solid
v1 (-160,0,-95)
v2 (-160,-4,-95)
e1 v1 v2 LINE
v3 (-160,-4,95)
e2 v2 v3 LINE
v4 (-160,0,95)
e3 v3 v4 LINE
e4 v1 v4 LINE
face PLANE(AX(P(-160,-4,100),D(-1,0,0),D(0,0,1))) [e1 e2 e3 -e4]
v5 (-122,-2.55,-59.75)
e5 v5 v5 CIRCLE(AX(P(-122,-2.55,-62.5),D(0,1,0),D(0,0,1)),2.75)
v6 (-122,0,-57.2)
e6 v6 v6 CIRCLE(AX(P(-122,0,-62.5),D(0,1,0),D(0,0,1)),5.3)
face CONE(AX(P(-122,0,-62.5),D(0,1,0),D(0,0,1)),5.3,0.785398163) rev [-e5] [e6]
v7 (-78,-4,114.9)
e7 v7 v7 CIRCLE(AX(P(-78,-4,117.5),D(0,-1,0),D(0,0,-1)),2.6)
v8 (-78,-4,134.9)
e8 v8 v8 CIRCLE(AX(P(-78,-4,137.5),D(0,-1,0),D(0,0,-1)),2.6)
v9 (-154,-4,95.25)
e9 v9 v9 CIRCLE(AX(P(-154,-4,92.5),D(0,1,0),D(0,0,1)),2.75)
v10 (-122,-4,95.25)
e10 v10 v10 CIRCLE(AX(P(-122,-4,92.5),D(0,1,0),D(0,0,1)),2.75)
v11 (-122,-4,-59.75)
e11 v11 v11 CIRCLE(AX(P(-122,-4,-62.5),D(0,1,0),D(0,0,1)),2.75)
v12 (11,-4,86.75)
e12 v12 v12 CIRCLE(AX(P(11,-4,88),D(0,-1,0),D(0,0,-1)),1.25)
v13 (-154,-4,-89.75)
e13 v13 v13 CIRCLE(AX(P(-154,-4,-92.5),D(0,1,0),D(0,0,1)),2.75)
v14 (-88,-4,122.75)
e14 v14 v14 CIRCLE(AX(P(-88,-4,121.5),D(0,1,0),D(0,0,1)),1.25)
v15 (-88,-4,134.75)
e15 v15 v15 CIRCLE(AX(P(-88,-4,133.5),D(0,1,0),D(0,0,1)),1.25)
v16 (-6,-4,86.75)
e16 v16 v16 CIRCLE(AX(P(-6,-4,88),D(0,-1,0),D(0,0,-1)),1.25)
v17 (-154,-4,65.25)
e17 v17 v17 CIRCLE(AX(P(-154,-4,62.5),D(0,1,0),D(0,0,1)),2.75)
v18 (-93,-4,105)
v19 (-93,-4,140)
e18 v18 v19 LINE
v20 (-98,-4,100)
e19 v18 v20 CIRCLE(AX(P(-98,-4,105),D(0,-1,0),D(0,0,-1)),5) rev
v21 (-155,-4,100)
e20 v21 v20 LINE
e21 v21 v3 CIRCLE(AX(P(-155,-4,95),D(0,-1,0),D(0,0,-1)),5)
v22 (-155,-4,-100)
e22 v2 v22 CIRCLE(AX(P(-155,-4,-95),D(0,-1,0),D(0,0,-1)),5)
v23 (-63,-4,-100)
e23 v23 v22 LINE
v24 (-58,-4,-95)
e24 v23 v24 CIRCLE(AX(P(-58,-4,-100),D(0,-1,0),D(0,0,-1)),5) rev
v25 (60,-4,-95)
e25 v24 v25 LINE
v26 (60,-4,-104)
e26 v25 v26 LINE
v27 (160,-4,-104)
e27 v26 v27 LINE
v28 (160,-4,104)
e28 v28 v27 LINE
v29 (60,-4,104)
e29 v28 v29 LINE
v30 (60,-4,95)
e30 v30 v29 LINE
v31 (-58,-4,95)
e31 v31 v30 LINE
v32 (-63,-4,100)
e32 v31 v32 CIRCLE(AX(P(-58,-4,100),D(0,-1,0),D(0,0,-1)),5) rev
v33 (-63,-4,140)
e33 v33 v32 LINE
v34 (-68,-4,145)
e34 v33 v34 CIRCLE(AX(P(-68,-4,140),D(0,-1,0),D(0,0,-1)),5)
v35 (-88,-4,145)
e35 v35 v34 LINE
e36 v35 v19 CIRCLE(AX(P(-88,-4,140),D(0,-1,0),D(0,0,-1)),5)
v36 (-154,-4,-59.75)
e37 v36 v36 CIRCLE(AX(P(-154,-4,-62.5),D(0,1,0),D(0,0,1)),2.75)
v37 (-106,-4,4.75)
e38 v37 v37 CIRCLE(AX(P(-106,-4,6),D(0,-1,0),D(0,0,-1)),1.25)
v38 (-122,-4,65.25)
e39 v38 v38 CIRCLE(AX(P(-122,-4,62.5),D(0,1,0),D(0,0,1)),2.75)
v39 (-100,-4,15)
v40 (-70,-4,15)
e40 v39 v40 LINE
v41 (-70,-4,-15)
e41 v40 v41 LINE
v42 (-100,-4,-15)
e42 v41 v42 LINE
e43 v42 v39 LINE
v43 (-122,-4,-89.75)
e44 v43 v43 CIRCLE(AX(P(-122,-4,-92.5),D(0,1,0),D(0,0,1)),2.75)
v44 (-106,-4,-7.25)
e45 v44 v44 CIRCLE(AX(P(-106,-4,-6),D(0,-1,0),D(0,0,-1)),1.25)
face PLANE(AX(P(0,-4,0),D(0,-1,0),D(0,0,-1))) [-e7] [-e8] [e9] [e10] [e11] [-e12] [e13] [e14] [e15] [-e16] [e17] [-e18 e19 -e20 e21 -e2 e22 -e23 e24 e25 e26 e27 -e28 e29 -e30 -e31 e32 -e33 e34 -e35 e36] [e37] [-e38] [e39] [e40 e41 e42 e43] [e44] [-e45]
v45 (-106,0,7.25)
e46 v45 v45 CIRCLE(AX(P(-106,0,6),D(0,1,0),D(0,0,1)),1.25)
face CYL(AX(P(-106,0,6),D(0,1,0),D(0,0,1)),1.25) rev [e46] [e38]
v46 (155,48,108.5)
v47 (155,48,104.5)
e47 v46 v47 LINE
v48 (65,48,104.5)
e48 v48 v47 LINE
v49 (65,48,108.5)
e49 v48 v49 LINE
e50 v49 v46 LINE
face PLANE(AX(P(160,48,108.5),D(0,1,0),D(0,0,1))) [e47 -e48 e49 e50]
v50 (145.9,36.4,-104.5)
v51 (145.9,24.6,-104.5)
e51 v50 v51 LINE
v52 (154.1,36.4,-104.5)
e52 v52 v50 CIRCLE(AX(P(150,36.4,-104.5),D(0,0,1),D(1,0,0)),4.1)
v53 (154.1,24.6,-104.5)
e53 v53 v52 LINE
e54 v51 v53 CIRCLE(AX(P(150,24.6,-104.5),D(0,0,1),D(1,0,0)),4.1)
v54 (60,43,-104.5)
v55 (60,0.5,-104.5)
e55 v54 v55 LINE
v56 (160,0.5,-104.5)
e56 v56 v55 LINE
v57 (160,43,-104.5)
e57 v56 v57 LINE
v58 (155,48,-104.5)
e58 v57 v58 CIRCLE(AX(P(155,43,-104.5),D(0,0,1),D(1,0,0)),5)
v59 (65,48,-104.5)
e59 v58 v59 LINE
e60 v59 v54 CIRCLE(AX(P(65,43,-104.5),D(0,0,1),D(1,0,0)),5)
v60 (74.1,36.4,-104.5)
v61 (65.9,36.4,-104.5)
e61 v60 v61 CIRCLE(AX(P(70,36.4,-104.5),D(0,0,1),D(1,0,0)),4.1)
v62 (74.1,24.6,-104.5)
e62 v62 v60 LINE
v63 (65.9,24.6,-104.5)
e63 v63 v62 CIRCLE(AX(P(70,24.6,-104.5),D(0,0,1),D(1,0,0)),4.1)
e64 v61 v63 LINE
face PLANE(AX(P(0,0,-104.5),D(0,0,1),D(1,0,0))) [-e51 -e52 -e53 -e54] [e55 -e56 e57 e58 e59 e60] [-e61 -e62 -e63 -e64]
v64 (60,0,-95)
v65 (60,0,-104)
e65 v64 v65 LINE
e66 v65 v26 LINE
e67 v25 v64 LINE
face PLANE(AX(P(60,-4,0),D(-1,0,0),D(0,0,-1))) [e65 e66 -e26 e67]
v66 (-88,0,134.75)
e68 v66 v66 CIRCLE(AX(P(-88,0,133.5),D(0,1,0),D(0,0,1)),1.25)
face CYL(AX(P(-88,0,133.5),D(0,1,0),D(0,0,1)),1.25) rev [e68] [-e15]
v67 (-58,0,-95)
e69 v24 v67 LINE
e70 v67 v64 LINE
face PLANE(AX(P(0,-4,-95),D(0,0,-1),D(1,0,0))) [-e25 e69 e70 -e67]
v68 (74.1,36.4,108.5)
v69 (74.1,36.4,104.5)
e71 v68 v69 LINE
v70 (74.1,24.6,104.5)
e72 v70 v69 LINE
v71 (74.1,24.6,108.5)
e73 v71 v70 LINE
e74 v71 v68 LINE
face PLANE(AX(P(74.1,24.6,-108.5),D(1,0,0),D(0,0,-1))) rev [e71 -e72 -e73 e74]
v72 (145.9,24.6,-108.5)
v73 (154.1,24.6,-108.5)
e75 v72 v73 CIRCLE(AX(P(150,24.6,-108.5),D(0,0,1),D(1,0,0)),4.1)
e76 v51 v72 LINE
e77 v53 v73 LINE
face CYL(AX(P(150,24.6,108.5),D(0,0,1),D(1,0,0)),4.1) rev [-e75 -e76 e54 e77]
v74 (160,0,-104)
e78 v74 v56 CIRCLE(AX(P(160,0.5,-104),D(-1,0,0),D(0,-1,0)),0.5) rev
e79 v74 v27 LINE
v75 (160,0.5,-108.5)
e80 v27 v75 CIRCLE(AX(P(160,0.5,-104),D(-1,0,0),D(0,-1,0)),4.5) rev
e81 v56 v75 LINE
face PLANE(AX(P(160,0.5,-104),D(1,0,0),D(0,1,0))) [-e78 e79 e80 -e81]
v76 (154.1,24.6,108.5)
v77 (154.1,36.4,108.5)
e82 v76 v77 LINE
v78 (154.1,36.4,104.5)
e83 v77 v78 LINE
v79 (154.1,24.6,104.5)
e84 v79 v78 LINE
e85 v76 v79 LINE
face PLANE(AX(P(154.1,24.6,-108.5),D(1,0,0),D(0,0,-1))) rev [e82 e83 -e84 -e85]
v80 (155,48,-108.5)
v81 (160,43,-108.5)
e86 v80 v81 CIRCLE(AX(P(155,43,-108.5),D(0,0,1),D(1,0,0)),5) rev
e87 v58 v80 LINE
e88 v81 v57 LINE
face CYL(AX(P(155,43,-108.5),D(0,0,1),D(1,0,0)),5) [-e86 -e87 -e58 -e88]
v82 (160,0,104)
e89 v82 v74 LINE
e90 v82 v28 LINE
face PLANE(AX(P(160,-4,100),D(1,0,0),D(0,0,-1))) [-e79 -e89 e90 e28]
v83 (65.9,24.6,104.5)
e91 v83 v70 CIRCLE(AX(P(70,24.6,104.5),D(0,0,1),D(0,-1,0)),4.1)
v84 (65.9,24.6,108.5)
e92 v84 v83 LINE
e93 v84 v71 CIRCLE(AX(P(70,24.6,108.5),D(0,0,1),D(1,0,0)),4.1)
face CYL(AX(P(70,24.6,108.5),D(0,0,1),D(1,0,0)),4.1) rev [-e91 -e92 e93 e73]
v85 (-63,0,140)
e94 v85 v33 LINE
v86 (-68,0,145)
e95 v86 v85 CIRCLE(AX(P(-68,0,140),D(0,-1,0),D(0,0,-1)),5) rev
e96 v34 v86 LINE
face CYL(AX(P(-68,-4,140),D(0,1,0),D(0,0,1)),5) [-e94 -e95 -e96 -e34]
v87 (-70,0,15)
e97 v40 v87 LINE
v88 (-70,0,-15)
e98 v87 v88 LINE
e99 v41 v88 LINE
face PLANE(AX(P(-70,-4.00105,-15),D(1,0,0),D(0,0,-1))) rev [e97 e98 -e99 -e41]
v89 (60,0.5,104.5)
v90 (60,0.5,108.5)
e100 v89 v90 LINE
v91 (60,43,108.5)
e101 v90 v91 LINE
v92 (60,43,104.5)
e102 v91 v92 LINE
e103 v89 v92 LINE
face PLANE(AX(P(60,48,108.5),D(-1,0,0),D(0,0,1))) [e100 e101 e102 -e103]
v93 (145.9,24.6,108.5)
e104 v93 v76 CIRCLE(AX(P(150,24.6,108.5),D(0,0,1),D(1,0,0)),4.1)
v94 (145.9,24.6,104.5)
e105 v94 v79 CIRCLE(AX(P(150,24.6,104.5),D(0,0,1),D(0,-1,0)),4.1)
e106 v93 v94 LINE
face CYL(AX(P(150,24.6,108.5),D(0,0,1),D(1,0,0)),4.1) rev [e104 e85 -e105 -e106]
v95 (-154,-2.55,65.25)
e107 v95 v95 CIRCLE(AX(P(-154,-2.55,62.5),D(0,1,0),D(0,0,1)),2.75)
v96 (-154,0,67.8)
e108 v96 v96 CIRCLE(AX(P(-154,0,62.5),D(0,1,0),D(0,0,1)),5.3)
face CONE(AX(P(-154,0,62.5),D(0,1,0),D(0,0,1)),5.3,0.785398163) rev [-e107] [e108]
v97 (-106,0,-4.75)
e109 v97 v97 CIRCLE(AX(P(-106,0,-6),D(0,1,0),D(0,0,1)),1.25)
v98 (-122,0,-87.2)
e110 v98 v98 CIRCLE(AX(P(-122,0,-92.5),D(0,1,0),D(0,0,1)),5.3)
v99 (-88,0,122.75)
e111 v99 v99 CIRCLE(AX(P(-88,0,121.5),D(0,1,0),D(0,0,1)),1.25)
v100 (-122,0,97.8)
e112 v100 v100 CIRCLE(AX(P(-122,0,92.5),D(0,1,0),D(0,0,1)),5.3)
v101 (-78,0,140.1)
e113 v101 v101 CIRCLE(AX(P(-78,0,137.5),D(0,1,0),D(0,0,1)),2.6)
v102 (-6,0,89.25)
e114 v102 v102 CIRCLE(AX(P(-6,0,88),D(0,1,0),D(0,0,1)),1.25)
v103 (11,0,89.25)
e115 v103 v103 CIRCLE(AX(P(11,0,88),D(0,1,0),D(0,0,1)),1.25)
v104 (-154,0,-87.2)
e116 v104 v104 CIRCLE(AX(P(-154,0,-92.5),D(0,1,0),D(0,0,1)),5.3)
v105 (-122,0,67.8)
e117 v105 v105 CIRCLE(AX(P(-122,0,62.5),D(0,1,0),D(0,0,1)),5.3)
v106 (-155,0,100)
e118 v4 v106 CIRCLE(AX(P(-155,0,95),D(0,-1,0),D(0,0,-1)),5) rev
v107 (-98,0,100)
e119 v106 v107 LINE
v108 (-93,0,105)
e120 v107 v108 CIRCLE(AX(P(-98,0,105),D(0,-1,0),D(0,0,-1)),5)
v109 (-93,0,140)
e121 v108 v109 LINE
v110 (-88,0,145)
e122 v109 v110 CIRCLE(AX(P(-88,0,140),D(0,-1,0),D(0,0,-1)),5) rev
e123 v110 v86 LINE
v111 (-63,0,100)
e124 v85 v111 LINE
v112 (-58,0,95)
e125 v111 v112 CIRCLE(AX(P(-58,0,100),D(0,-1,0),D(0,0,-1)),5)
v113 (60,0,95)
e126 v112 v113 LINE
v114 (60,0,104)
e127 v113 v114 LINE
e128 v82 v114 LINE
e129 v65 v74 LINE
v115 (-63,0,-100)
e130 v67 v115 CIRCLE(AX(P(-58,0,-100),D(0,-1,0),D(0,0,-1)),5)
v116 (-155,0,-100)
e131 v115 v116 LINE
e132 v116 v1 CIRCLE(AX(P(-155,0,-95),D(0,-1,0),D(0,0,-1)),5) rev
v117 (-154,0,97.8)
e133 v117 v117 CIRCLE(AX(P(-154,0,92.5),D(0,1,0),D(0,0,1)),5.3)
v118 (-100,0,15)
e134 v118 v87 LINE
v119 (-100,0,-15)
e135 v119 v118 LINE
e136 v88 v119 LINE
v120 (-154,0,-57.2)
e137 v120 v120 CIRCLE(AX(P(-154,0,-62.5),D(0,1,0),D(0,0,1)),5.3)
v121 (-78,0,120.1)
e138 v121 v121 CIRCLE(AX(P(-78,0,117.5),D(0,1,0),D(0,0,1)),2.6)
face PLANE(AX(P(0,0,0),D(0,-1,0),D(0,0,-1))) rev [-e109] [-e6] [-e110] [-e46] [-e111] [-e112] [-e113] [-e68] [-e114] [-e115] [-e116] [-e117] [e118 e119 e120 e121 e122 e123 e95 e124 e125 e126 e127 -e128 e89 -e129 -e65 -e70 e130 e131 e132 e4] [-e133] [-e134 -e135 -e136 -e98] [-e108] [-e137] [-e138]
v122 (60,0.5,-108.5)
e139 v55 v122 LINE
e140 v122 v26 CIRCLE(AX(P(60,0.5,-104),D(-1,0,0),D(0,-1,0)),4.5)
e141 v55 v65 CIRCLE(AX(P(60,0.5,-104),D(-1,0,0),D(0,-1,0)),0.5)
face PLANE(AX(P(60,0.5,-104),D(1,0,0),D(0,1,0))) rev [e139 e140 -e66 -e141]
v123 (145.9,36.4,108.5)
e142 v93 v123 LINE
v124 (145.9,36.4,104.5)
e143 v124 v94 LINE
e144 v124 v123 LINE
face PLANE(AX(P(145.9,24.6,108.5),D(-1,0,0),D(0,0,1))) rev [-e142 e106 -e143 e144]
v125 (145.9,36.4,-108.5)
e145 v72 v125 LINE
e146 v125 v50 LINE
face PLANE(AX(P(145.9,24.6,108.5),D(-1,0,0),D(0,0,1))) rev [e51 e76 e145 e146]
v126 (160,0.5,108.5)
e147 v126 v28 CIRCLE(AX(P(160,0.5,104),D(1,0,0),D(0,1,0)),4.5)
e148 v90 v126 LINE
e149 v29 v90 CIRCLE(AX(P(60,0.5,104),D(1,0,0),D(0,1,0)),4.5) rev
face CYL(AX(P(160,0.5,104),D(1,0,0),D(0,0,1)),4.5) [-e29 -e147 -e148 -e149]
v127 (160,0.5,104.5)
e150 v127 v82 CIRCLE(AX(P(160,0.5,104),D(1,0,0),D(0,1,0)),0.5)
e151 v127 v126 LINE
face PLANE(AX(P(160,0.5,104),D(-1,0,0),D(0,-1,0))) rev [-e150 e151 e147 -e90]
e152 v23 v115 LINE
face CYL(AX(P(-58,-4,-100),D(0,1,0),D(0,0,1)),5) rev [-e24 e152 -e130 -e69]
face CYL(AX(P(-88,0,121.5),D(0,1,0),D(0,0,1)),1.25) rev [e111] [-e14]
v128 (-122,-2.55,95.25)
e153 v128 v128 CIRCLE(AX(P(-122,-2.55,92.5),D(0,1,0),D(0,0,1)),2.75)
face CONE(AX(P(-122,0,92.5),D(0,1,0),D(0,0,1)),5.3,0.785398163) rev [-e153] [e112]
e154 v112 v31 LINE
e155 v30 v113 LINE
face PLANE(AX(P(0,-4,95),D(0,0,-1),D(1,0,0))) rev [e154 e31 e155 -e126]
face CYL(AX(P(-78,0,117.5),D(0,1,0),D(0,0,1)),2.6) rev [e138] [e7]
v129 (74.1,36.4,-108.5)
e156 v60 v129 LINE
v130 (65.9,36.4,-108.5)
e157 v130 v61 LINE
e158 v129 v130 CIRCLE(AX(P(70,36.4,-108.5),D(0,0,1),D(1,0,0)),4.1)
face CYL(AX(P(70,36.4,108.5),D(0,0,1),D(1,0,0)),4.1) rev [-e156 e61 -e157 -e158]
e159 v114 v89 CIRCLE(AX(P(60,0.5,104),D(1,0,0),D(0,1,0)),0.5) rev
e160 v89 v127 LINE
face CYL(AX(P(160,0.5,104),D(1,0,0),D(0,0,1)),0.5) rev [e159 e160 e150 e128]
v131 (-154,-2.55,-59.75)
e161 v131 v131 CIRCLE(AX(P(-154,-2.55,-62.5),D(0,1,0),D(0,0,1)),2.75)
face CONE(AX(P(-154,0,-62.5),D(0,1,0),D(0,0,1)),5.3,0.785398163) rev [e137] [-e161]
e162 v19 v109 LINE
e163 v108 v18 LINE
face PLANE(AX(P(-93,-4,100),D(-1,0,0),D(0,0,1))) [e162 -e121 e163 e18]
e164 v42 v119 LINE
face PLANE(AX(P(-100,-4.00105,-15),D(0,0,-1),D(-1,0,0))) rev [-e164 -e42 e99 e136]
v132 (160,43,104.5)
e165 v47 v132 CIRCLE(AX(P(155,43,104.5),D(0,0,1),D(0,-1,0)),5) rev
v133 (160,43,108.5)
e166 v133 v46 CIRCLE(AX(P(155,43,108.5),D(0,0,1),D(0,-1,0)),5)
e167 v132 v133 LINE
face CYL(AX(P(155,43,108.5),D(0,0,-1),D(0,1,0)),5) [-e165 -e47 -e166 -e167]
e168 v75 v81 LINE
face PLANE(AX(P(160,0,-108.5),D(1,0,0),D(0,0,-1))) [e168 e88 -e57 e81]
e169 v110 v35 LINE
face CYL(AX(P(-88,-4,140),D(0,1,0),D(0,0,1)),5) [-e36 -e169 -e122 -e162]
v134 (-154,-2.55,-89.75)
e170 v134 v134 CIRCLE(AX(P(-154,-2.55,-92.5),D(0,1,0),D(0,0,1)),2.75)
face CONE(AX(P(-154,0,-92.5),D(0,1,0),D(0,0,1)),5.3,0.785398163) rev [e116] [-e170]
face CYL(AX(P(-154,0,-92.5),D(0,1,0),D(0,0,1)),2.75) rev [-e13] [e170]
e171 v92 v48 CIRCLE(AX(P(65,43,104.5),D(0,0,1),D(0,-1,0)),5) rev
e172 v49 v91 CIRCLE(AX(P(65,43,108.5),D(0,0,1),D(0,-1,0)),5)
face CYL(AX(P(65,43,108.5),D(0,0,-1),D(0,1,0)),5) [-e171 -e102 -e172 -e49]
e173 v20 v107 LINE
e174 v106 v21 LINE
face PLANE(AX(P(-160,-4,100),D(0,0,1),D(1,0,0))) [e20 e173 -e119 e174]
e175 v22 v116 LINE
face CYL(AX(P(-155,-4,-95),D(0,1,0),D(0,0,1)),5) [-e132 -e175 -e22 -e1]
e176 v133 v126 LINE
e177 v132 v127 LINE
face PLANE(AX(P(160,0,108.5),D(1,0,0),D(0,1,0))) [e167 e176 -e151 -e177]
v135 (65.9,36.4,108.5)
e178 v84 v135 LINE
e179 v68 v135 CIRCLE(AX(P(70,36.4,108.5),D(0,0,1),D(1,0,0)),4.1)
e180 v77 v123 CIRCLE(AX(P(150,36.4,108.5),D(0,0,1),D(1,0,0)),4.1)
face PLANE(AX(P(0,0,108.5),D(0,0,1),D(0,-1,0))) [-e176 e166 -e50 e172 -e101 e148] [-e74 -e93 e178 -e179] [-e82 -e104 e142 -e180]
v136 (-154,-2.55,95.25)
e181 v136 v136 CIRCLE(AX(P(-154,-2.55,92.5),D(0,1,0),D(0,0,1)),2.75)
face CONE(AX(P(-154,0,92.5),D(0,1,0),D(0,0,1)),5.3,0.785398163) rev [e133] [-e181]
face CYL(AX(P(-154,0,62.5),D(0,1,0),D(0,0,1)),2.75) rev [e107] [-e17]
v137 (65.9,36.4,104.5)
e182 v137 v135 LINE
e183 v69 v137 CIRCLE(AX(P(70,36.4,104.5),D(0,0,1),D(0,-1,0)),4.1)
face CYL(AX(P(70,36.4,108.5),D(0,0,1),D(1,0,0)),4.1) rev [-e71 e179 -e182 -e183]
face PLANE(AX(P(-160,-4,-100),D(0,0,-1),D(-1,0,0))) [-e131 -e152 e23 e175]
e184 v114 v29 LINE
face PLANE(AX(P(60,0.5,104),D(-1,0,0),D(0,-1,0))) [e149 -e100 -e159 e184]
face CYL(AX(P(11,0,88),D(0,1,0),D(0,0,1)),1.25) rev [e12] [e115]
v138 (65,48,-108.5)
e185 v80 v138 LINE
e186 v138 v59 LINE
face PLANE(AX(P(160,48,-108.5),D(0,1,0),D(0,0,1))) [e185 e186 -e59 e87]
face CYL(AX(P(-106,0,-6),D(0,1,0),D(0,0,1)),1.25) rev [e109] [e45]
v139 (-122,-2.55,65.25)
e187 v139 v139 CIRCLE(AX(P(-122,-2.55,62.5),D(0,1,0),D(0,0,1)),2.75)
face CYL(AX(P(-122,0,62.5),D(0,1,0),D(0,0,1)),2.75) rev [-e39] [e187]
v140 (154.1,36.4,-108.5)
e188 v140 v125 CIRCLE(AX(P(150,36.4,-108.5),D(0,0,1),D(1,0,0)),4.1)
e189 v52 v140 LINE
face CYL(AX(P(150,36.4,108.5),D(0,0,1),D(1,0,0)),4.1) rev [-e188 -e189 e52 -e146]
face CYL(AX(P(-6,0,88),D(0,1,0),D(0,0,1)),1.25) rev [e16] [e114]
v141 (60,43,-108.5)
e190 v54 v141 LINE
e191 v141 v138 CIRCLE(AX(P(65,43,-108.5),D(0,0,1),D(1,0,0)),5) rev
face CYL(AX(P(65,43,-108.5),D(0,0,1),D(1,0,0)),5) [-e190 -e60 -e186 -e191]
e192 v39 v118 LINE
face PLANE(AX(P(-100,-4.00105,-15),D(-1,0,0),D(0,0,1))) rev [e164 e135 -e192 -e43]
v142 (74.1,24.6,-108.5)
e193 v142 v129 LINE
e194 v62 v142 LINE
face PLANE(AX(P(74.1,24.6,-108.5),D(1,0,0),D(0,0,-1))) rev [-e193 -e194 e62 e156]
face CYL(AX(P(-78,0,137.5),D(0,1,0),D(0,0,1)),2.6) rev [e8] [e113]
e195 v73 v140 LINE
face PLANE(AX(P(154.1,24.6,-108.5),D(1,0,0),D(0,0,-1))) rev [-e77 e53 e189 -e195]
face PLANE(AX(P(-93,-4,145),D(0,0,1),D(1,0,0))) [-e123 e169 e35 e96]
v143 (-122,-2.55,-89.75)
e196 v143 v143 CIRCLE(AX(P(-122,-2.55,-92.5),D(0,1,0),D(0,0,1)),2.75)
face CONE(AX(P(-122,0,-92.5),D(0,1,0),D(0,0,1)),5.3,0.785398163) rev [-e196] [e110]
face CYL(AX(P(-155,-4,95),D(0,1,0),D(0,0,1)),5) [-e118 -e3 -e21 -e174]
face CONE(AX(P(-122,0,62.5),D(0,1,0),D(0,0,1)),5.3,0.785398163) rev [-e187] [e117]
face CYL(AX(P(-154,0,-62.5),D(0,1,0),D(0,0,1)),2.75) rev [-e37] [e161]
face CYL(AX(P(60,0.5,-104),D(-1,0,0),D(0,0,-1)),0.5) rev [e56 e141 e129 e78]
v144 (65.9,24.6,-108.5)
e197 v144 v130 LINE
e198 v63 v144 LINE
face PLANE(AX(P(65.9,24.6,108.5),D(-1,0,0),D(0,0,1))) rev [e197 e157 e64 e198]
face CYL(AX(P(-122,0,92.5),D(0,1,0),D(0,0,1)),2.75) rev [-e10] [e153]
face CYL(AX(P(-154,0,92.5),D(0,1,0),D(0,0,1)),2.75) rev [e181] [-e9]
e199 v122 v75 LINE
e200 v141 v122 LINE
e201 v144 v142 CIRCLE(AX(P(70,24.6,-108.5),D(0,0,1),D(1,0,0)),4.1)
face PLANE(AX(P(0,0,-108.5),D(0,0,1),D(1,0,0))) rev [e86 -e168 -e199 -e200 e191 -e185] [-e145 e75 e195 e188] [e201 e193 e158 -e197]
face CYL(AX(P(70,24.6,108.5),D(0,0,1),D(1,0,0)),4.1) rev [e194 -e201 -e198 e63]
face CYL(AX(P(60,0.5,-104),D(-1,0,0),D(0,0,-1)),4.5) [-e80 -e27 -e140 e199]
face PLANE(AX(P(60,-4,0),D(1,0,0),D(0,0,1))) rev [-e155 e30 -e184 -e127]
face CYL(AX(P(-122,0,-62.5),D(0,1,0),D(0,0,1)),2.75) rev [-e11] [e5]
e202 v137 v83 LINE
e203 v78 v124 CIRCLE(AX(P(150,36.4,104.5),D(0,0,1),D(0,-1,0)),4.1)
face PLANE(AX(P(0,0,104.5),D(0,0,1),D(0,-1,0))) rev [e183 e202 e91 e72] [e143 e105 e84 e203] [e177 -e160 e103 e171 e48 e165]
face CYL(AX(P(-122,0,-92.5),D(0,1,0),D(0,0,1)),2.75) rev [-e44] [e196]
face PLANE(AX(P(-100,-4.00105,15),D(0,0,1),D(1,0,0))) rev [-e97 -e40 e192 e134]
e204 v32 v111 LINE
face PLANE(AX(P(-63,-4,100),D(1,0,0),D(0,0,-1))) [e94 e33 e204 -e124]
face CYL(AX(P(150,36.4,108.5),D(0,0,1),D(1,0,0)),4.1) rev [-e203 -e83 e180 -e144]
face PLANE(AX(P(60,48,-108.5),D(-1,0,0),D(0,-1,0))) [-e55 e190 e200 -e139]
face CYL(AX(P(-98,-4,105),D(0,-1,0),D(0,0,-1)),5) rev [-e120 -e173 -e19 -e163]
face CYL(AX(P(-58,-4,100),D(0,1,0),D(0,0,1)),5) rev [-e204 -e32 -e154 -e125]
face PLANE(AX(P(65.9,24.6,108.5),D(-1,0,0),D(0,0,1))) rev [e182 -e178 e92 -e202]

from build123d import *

# Parameters (mm, degrees)
SKETCH_1_W                  = 320
SKETCH_1_H                  = 200
SM_BASE_FLANGE_1_DEPTH      = 4
HOLE_WIZARD_1_AT_2_COUNT    = 2
HOLE_WIZARD_1_AT_2_PITCH    = 30
HOLE_WIZARD_1_AT_3_COUNT    = 2
HOLE_WIZARD_1_AT_3_PITCH    = 43.863424399
HOLE_WIZARD_1_AT_4_COUNT    = 2
HOLE_WIZARD_1_AT_4_PITCH    = 32
HOLE_WIZARD_1_AT_5_COUNT    = 2
HOLE_WIZARD_1_AT_5_PITCH    = 129.031004026
HOLE_WIZARD_1_AT_6_COUNT    = 2
HOLE_WIZARD_1_AT_6_PITCH    = 125
HOLE_WIZARD_1_AT_7_COUNT    = 2
HOLE_WIZARD_1_AT_7_PITCH    = 158.268758762
HOLE_WIZARD_1_AT_8_COUNT    = 2
HOLE_WIZARD_1_AT_8_PITCH    = 155
SKETCH_9_W                  = 30
SKETCH_9_H                  = 45
SM_BASE_FLANGE_1_2_DEPTH    = 4
SKETCH_27_W                 = 123
SKETCH_27_H                 = 5
CUT_EXTRUDE_2_DEPTH         = 10
SM_EDGE_FLANGE_1_DEPTH      = 100
SM_EDGE_FLANGE_1_BEND_DEPTH = 100
HOLE_START                  = -108.5
HOLE_WIZARD_8_2_8_2_1_DEPTH = 217
F_5_2_5_2_DIAMETER_HOLE1_D  = 5.2
CUT_EXTRUDE_1_REACH         = 223.199
SKETCH_21_W                 = 30
SKETCH_21_H                 = 30
HOLE_WIZARD_M3_2_D          = 2.5
OTHER_START                 = -108.5
OTHER_1_DEPTH               = 217
OTHER_START_2               = -4
OTHER_2_DEPTH               = 4
OTHER_2_2_DEPTH             = 4
HOLE_WIZARD_M3_1_D          = 2.5
HOLE_WIZARD_M3_3_D          = 2.5


# Read off the part's stored shape, not the designer's step: Ø8.2 (8.2) 直径槽口1, 断开-边角1, 断开-边角2
# Sheet-metal steps are written as plain solids
with BuildPart() as part:
    # Sketch 1 → Sm Base Flange 1 (new body)
    with BuildSketch(Plane(origin=(0, 0, 0), x_dir=(1, 0, 0), z_dir=(0, 1, 0))):
        Rectangle(SKETCH_1_W, SKETCH_1_H)
    extrude(amount=-SM_BASE_FLANGE_1_DEPTH)

    # 草图7 → 打孔尺寸开槽半沉头螺钉的类型1 (revolve, cut)
    with BuildSketch(Plane(origin=(-154, 0, 62.5), x_dir=(0, 0, 1), z_dir=(1, 0, 0))):
        Polygon((0, 0), (0, 4), (2.75, 4), (2.75, 2.55), (5.3, 0), align=None)
    hole_wizard_1 = revolve(axis=Axis((-154, 6.35, 62.5), (0, -1, 0)), mode=Mode.SUBTRACT)

    # 打孔尺寸开槽半沉头螺钉的类型1 at 2: 打孔尺寸开槽半沉头螺钉的类型1 ×2
    with Locations(*[(0, 0, i * HOLE_WIZARD_1_AT_2_PITCH) for i in range(1, HOLE_WIZARD_1_AT_2_COUNT)]):
        add(hole_wizard_1, mode=Mode.SUBTRACT)

    # 打孔尺寸开槽半沉头螺钉的类型1 at 3: 打孔尺寸开槽半沉头螺钉的类型1 ×2
    with Locations(*[Vector(0.7295372041400852, 0, 0.6839411288813297) * (i * HOLE_WIZARD_1_AT_3_PITCH) for i in range(1, HOLE_WIZARD_1_AT_3_COUNT)]):
        add(hole_wizard_1, mode=Mode.SUBTRACT)

    # 打孔尺寸开槽半沉头螺钉的类型1 at 4: 打孔尺寸开槽半沉头螺钉的类型1 ×2
    with Locations(*[(i * HOLE_WIZARD_1_AT_4_PITCH, 0, 0) for i in range(1, HOLE_WIZARD_1_AT_4_COUNT)]):
        add(hole_wizard_1, mode=Mode.SUBTRACT)

    # 打孔尺寸开槽半沉头螺钉的类型1 at 5: 打孔尺寸开槽半沉头螺钉的类型1 ×2
    with Locations(*[Vector(0.24800241028513723, 0, -0.9687594151763185) * (i * HOLE_WIZARD_1_AT_5_PITCH) for i in range(1, HOLE_WIZARD_1_AT_5_COUNT)]):
        add(hole_wizard_1, mode=Mode.SUBTRACT)

    # 打孔尺寸开槽半沉头螺钉的类型1 at 6: 打孔尺寸开槽半沉头螺钉的类型1 ×2
    with Locations(*[(0, 0, -i * HOLE_WIZARD_1_AT_6_PITCH) for i in range(1, HOLE_WIZARD_1_AT_6_COUNT)]):
        add(hole_wizard_1, mode=Mode.SUBTRACT)

    # 打孔尺寸开槽半沉头螺钉的类型1 at 7: 打孔尺寸开槽半沉头螺钉的类型1 ×2
    with Locations(*[Vector(0.20218772327747656, 0, -0.979346784625278) * (i * HOLE_WIZARD_1_AT_7_PITCH) for i in range(1, HOLE_WIZARD_1_AT_7_COUNT)]):
        add(hole_wizard_1, mode=Mode.SUBTRACT)

    # 打孔尺寸开槽半沉头螺钉的类型1 at 8: 打孔尺寸开槽半沉头螺钉的类型1 ×2
    with Locations(*[(0, 0, -i * HOLE_WIZARD_1_AT_8_PITCH) for i in range(1, HOLE_WIZARD_1_AT_8_COUNT)]):
        add(hole_wizard_1, mode=Mode.SUBTRACT)

    # 草图9 → Sm Base Flange 1 2 (add)
    with BuildSketch(Plane(origin=(0, 0, 0), x_dir=(1, 0, 0), z_dir=(0, 1, 0))):
        with Locations((-78, -122.5)):
            Rectangle(SKETCH_9_W, SKETCH_9_H)
    extrude(amount=-SM_BASE_FLANGE_1_2_DEPTH)

    # 草图27 → 切除-拉伸2 (cut)
    with BuildSketch(Plane(origin=(0, 0, 0), x_dir=(1, 0, 0), z_dir=(0, 1, 0))):
        with Locations((-1.5, -97.5)):
            Rectangle(SKETCH_27_W, SKETCH_27_H)
        with Locations((-1.5, 97.5)):
            Rectangle(SKETCH_27_W, SKETCH_27_H)
    extrude(amount=-CUT_EXTRUDE_2_DEPTH, mode=Mode.SUBTRACT)

    # 边线-法兰1 section (across the edge) → 边线-法兰1 (add)
    with BuildSketch(Plane(origin=(60, 0, 104.5), x_dir=(0, 0, -1), z_dir=(1, 0, 0))):
        with BuildLine():
            Line((-4, 0.5), (-4, 48))
            Line((-4, 48), (0, 48))
            Line((0, 48), (0, 0.5))
            ThreePointArc((0, 0.5), (0.146446609, 0.146446609), (0.5, 0))
            Line((0.5, 0), (4.5, 0))
            Line((4.5, 0), (4.5, -4))
            Line((4.5, -4), (0.5, -4))
            ThreePointArc((0.5, -4), (-2.681980515, -2.681980515), (-4, 0.5))
        make_face()
    extrude(amount=SM_EDGE_FLANGE_1_DEPTH)

    # 边线-法兰1 section 2 (across the edge) → 边线-法兰1 bend (add)
    with BuildSketch(Plane(origin=(160, 0, -104.5), x_dir=(0, 0, 1), z_dir=(-1, 0, 0))):
        with BuildLine():
            Line((-4, 0.5), (-4, 48))
            Line((-4, 48), (0, 48))
            Line((0, 48), (0, 0.5))
            ThreePointArc((0, 0.5), (0.146446609, 0.146446609), (0.5, 0))
            Line((0.5, 0), (4.5, 0))
            Line((4.5, 0), (4.5, -4))
            Line((4.5, -4), (0.5, -4))
            ThreePointArc((0.5, -4), (-2.681980515, -2.681980515), (-4, 0.5))
        make_face()
    extrude(amount=SM_EDGE_FLANGE_1_BEND_DEPTH)

    # Ø8.2 (8.2) 直径槽口1 outline → Ø8.2 (8.2) 直径槽口1 (cut)
    with BuildSketch(Plane.XY.offset(HOLE_START)):
        with BuildLine():
            ThreePointArc((145.9, 24.6), (150, 20.5), (154.1, 24.6))
            Line((154.1, 24.6), (154.1, 36.4))
            ThreePointArc((154.1, 36.4), (150, 40.5), (145.9, 36.4))
            Line((145.9, 36.4), (145.9, 24.6))
        make_face()
        with BuildLine():
            ThreePointArc((65.9, 24.6), (70, 20.5), (74.1, 24.6))
            Line((74.1, 24.6), (74.1, 36.4))
            ThreePointArc((74.1, 36.4), (70, 40.5), (65.9, 36.4))
            Line((65.9, 36.4), (65.9, 24.6))
        make_face()
    extrude(amount=HOLE_WIZARD_8_2_8_2_1_DEPTH, mode=Mode.SUBTRACT)

    # Ø5.2 (5.2) Diameter Hole1 (through all)
    with Locations(Plane(origin=(0, 0, 0), x_dir=(1, 0, 0), z_dir=(0, 1, 0))):
        with Locations((-78, -137.5), (-78, -117.5)):
            Hole(F_5_2_5_2_DIAMETER_HOLE1_D / 2)

    # 草图21 → 切除-拉伸1 (cut, up to next)
    with BuildSketch(Plane(origin=(0, 0, 0), x_dir=(1, 0, 0), z_dir=(0, 1, 0)), mode=Mode.PRIVATE) as cut_extrude_1_sk1:
        with Locations((-85, 0)):
            Rectangle(SKETCH_21_W, SKETCH_21_H)
    cut_extrude_1_tool1 = extrude(cut_extrude_1_sk1.sketch, amount=-CUT_EXTRUDE_1_REACH, mode=Mode.PRIVATE) & part.part
    add(cut_extrude_1_tool1.solids().sort_by_distance((-85, 0, 0))[0], mode=Mode.SUBTRACT)

    # M3 螺纹孔2 (through all)
    with Locations(Plane(origin=(0, 0, 0), x_dir=(1, 0, 0), z_dir=(0, 1, 0))):
        with Locations((-106, 6), (-106, -6)):
            Hole(HOLE_WIZARD_M3_2_D / 2)

    # Other 1 outline → Other 1 (cut)
    with BuildSketch(Plane.XY.offset(OTHER_START)):
        with BuildLine():
            ThreePointArc((60, 43), (61.464466094, 46.535533906), (65, 48))
            Line((65, 48), (60, 48))
            Line((60, 48), (60, 43))
        make_face()
        with BuildLine():
            ThreePointArc((155, 48), (158.535533906, 46.535533906), (160, 43))
            Line((160, 43), (160, 48))
            Line((160, 48), (155, 48))
        make_face()
    extrude(amount=OTHER_1_DEPTH, mode=Mode.SUBTRACT)

    # Other 2 outline → Other 2 (cut)
    with BuildSketch(Plane(origin=(0, 0, 0), x_dir=(1, 0, 0), z_dir=(0, 1, 0)).offset(OTHER_START_2)):
        with BuildLine():
            ThreePointArc((-63, -140), (-64.464466094, -143.535533906), (-68, -145))
            Line((-68, -145), (-63, -145))
            Line((-63, -145), (-63, -140))
        make_face()
        with BuildLine():
            ThreePointArc((-88, -145), (-91.535533906, -143.535533906), (-93, -140))
            Line((-93, -140), (-93, -145))
            Line((-93, -145), (-88, -145))
        make_face()
        with BuildLine():
            ThreePointArc((-155, -100), (-158.535533906, -98.535533906), (-160, -95))
            Line((-160, -95), (-160, -100))
            Line((-160, -100), (-155, -100))
        make_face()
        with BuildLine():
            ThreePointArc((-160, 95), (-158.535533906, 98.535533906), (-155, 100))
            Line((-155, 100), (-160, 100))
            Line((-160, 100), (-160, 95))
        make_face()
    extrude(amount=OTHER_2_DEPTH, mode=Mode.SUBTRACT)

    # Other 2 2 outline → Other 2 2 (add)
    with BuildSketch(Plane(origin=(0, 0, 0), x_dir=(1, 0, 0), z_dir=(0, 1, 0)).offset(OTHER_START_2)):
        with BuildLine():
            ThreePointArc((-58, 95), (-61.535533906, 96.464466094), (-63, 100))
            Line((-63, 100), (-63, 95))
            Line((-63, 95), (-58, 95))
        make_face()
        with BuildLine():
            Line((-63, -95), (-63, -100))
            ThreePointArc((-63, -100), (-61.535533906, -96.464466094), (-58, -95))
            Line((-58, -95), (-63, -95))
        make_face()
        with BuildLine():
            Line((-93, -100), (-98, -100))
            ThreePointArc((-98, -100), (-94.464466094, -101.464466094), (-93, -105))
            Line((-93, -105), (-93, -100))
        make_face()
    extrude(amount=OTHER_2_2_DEPTH)

    # M3 螺纹孔1 (through all)
    with Locations(Plane(origin=(0, 0, 0), x_dir=(1, 0, 0), z_dir=(0, 1, 0))):
        with Locations((-6, -88), (11, -88)):
            Hole(HOLE_WIZARD_M3_1_D / 2)

    # M3 螺纹孔3 (through all)
    with Locations(Plane(origin=(0, 0, 0), x_dir=(1, 0, 0), z_dir=(0, 1, 0))):
        with Locations((-88, -121.5), (-88, -133.5)):
            Hole(HOLE_WIZARD_M3_3_D / 2)


solid = part.part
